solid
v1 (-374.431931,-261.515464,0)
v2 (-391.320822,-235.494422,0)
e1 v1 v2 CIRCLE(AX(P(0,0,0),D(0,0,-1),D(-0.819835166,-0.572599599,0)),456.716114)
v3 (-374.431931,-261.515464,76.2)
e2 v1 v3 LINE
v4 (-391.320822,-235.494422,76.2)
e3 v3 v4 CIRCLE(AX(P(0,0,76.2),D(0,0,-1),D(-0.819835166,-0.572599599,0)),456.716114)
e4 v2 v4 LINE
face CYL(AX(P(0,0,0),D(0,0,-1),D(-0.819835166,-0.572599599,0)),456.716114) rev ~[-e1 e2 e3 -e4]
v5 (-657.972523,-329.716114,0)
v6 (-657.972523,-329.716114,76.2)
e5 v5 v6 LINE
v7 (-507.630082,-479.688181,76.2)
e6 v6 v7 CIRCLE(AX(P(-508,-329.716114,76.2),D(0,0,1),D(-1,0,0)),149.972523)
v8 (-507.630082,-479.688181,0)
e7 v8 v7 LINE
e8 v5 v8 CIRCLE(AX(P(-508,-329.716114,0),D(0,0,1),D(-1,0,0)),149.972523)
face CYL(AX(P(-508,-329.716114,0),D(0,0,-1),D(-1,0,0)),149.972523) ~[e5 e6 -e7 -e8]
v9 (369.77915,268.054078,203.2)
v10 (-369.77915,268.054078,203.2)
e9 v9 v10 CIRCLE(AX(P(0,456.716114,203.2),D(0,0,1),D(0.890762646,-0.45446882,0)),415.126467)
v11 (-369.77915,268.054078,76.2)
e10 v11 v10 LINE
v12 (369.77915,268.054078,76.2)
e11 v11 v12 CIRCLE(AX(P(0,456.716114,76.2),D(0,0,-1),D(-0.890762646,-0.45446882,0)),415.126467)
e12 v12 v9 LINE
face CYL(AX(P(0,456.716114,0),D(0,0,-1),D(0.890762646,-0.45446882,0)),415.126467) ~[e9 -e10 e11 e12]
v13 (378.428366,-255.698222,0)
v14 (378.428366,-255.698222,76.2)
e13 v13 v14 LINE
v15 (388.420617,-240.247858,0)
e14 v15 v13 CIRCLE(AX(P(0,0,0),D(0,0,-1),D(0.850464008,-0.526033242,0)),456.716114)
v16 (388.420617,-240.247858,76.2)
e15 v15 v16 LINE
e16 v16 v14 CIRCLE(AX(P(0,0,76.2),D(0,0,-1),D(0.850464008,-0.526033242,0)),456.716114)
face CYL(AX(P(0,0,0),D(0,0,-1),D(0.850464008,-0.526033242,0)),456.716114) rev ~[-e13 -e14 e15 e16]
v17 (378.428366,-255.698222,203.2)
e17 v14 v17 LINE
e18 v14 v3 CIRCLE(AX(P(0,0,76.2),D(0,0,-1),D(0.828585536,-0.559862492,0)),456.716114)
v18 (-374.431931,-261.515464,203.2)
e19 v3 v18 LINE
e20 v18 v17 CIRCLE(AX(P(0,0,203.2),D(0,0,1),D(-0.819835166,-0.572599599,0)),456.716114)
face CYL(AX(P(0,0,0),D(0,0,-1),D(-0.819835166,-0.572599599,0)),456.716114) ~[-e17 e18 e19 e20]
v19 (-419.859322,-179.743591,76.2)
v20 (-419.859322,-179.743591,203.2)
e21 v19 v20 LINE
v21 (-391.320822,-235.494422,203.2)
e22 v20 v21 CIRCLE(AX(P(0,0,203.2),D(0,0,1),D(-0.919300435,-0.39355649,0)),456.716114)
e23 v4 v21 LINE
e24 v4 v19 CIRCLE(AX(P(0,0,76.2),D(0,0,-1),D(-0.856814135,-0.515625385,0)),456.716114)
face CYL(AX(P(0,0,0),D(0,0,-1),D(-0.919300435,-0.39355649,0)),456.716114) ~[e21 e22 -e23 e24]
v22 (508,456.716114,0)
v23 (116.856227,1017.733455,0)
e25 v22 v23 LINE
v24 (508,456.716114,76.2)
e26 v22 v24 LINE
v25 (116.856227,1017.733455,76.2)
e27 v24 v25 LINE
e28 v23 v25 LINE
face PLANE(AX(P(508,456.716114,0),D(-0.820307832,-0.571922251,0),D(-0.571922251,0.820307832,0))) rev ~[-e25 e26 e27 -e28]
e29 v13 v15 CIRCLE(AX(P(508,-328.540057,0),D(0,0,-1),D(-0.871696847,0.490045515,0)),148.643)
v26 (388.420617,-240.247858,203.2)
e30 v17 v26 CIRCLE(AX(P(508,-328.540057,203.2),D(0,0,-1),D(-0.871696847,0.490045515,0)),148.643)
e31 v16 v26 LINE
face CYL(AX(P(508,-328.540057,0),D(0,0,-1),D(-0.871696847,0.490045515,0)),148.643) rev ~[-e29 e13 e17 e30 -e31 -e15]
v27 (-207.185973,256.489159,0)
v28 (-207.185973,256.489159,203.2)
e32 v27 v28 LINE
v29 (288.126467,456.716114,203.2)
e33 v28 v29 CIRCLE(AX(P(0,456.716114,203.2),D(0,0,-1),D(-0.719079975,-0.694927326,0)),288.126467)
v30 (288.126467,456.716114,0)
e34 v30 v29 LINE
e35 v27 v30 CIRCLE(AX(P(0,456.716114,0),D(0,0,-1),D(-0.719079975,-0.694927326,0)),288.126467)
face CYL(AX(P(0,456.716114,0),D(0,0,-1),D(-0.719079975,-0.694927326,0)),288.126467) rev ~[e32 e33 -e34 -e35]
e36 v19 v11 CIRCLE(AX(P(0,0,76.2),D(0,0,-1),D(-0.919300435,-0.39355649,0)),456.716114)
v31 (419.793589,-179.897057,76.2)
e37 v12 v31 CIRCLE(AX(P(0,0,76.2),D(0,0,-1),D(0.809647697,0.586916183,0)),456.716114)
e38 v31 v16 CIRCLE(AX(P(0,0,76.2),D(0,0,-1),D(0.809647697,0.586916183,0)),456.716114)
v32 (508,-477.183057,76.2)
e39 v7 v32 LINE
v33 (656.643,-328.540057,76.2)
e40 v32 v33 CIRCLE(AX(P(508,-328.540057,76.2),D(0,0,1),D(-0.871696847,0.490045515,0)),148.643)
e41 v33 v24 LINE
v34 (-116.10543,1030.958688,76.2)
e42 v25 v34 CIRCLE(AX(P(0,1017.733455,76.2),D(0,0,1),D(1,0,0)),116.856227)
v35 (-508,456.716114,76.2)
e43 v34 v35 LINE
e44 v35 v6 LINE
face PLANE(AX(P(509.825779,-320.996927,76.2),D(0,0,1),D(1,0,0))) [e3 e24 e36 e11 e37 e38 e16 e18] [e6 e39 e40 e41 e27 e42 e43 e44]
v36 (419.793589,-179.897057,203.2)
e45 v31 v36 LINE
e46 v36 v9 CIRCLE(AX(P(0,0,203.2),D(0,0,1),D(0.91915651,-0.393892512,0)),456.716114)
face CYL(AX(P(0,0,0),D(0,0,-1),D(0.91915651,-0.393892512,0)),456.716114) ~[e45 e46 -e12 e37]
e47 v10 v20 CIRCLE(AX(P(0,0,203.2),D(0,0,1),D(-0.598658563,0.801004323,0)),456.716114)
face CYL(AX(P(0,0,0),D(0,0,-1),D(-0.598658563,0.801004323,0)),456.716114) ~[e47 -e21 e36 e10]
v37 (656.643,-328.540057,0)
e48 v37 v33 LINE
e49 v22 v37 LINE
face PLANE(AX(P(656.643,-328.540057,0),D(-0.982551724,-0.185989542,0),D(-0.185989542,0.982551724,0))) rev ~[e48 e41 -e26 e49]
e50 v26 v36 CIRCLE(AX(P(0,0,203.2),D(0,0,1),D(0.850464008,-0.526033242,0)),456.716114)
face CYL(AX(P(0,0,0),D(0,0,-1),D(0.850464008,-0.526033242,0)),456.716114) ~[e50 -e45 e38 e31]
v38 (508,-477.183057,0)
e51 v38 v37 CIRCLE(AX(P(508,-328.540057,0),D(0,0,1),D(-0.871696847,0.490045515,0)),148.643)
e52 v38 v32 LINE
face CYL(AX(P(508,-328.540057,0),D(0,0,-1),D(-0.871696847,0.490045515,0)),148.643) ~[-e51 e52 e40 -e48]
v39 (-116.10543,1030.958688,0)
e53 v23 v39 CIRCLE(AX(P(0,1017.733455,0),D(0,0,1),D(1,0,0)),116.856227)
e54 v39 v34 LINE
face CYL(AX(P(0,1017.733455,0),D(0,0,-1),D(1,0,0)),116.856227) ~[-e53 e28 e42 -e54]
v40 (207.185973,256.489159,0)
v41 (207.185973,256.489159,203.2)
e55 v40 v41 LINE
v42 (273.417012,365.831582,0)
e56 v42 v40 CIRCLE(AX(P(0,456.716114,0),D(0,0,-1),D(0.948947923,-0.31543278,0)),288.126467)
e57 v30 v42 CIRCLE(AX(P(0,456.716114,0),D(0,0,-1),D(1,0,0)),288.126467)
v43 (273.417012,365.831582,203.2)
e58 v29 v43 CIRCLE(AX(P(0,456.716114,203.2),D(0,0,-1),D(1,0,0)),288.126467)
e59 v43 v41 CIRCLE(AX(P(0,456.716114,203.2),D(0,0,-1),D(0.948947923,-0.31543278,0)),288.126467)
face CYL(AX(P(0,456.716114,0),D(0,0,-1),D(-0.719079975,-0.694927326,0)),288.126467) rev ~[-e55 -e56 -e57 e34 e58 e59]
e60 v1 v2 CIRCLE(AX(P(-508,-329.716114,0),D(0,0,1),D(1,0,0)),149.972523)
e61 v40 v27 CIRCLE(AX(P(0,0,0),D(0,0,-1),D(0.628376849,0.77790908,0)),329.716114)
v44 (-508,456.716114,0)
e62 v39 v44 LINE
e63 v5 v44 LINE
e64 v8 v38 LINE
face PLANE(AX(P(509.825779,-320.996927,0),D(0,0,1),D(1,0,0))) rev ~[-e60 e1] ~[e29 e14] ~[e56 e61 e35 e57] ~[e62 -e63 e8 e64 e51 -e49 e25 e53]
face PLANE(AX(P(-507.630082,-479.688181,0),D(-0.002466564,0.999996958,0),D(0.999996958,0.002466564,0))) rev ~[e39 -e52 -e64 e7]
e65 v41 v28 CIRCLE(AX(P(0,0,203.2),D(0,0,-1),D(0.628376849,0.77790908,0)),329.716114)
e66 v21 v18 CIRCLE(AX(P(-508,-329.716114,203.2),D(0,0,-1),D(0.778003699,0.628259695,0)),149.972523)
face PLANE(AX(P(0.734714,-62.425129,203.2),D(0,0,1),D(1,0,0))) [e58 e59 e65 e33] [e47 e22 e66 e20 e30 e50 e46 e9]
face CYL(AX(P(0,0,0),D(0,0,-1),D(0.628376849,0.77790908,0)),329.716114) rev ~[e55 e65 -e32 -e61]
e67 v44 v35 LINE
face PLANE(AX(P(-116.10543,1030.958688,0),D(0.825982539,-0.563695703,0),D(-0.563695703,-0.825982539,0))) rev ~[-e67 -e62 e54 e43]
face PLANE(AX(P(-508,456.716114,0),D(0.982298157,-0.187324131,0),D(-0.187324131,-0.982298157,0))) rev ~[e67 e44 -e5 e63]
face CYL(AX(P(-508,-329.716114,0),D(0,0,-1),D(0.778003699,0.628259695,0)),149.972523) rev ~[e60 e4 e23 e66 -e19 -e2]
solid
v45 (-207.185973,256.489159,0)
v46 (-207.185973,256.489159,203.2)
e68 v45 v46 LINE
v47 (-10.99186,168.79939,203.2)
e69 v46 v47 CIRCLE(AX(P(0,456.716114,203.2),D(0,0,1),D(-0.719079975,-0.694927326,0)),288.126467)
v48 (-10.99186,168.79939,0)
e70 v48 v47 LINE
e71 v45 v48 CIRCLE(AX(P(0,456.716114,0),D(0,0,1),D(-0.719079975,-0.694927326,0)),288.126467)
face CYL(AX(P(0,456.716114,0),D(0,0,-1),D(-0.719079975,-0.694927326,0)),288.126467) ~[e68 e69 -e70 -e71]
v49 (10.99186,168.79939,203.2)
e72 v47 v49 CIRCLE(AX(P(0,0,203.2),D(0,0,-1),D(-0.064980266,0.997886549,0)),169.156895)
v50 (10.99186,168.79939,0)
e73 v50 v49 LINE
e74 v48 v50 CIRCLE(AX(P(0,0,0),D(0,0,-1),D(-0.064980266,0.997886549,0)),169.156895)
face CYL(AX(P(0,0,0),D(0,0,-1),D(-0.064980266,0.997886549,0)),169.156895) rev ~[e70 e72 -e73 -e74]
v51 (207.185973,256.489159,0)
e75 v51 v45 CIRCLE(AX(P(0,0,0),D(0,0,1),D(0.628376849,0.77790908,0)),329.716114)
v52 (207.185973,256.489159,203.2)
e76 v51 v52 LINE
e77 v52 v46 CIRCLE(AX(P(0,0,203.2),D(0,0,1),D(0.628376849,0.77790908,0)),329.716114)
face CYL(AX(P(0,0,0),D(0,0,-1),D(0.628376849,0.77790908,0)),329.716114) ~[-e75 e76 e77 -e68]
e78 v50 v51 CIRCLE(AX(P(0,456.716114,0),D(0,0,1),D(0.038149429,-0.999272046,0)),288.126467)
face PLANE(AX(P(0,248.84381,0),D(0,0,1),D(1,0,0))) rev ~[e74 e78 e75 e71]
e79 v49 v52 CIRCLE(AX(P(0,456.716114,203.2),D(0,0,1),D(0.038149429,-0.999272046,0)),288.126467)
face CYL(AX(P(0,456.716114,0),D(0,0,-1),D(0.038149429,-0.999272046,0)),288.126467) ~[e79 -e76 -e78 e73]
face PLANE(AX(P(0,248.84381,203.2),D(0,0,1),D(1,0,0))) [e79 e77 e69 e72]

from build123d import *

# Parameters (mm, degrees)
F1_DEPTH = 203.2
F2_DEPTH = 76.2
F3_DEPTH = 76.2


with BuildPart() as f1:
    # F0 (on Top) → F1 (new body)
    with BuildSketch(Plane.XY):
        with BuildLine():
            ThreePointArc((419.7935890943, -179.8970573523), (447.3902688574, -91.8235047271), (456.7161138921, 0))
            ThreePointArc((456.7161138921, 0), (434.4385486274, 140.8998089254), (369.7791499823, 268.054078363))
            ThreePointArc((369.7791499823, 268.054078363), (325.2928462726, 320.5841119777), (273.4170123321, 365.8315815455))
            ThreePointArc((273.4170123321, 365.8315815455), (246.4421811438, 307.4408238889), (207.1859726201, 256.489158659))
            ThreePointArc((207.1859726201, 256.489158659), (297.5107304832, 142.1269890184), (329.7161138921, 0))
            ThreePointArc((329.7161138921, 0), (-142.1269890184, -297.5107304832), (-207.1859726201, 256.489158659))
            ThreePointArc((-207.1859726201, 256.489158659), (-246.4421811438, 307.4408238889), (-273.4170123321, 365.8315815455))
            ThreePointArc((-273.4170123321, 365.8315815455), (-325.2928462726, 320.5841119777), (-369.7791499823, 268.054078363))
            ThreePointArc((-369.7791499823, 268.054078363), (-453.8864585085, 50.7611216519), (-419.8593220682, -179.7435905981))
            ThreePointArc((-419.8593220682, -179.7435905981), (-406.5468550807, -208.1087775964), (-391.3208220922, -235.4944221967))
            ThreePointArc((-391.3208220922, -235.4944221967), (-382.2017695395, -248.0670908962), (-374.4319310628, -261.5154635758))
            ThreePointArc((-374.4319310628, -261.5154635758), (3.5288735732, -456.7024805494), (378.4283659046, -255.6982216744))
            ThreePointArc((378.4283659046, -255.6982216744), (383.1851939749, -247.8182784421), (388.4206166967, -240.2478578752))
            ThreePointArc((388.4206166967, -240.2478578752), (405.232162336, -210.6573124702), (419.7935890943, -179.8970573523))
        make_face()
        with BuildLine():
            ThreePointArc((273.4170123321, 365.8315815455), (325.2928462726, 320.5841119777), (369.7791499823, 268.054078363))
            ThreePointArc((369.7791499823, 268.054078363), (385.986239752, 609.5055315027), (140.4677009498, 847.3550883961))
            ThreePointArc((140.4677009498, 847.3550883961), (1.9062997603, 871.8382036836), (-136.8741128131, 848.6286815054))
            ThreePointArc((-136.8741128131, 848.6286815054), (-385.2805466524, 611.2764056323), (-369.7791499823, 268.054078363))
            ThreePointArc((-369.7791499823, 268.054078363), (-325.2928462726, 320.5841119777), (-273.4170123321, 365.8315815455))
            ThreePointArc((-273.4170123321, 365.8315815455), (-46.0335917284, 741.1414455435), (288.1264667684, 456.7161138921))
            ThreePointArc((288.1264667684, 456.7161138921), (284.4253316514, 410.6825221637), (273.4170123321, 365.8315815455))
        make_face()
    extrude(amount=F1_DEPTH)

    # F0 (on Top) → F2 (join)
    with BuildSketch(Plane.XY):
        with BuildLine():
            ThreePointArc((-136.8741128131, 848.6286815054), (1.9062997603, 871.8382036836), (140.4677009498, 847.3550883961))
            Line((140.4677009498, 847.3550883961), (116.8562267222, 1017.7334547043))
            ThreePointArc((116.8562267222, 1017.7334547043), (-6.6232636312, 901.0650780865), (-116.1054302545, 1030.9586877525))
            Line((-116.1054302545, 1030.9586877525), (-136.8741128131, 848.6286815054))
        make_face()
        with BuildLine():
            ThreePointArc((-369.7791499823, 268.054078363), (-385.2805466524, 611.2764056323), (-136.8741128131, 848.6286815054))
            Line((-136.8741128131, 848.6286815054), (-116.1054302545, 1030.9586877525))
            Line((-116.1054302545, 1030.9586877525), (-508, 456.7161138921))
            Line((-508, 456.7161138921), (-647.4473526625, -274.5237812852))
            ThreePointArc((-647.4473526625, -274.5237812852), (-592.3042832709, -205.6816607537), (-508, -179.7435905981))
            Line((-508, -179.7435905981), (-419.8593220682, -179.7435905981))
            ThreePointArc((-419.8593220682, -179.7435905981), (-453.8864585085, 50.7611216519), (-369.7791499823, 268.054078363))
        make_face()
        with BuildLine():
            ThreePointArc((369.7791499823, 268.054078363), (434.4385486274, 140.8998089254), (456.7161138921, 0))
            ThreePointArc((456.7161138921, 0), (447.3902688574, -91.8235047271), (419.7935890943, -179.8970573523))
            Line((419.7935890943, -179.8970573523), (508, -179.8970573523))
            ThreePointArc((508, -179.8970573523), (591.7238414708, -205.718805945), (646.3592496941, -274.212721728))
            Line((646.3592496941, -274.212721728), (508, 456.7161138919))
            Line((508, 456.7161138919), (116.8562267222, 1017.7334547043))
            Line((116.8562267222, 1017.7334547043), (140.4677009498, 847.3550883961))
            ThreePointArc((140.4677009498, 847.3550883961), (385.986239752, 609.5055315027), (369.7791499823, 268.054078363))
        make_face()
        with BuildLine():
            Line((508, -179.8970573523), (419.7935890943, -179.8970573523))
            ThreePointArc((419.7935890943, -179.8970573523), (405.232162336, -210.6573124702), (388.4206166967, -240.2478578752))
            ThreePointArc((388.4206166967, -240.2478578752), (441.0271546914, -195.8397204001), (508, -179.8970573523))
        make_face()
        with BuildLine():
            ThreePointArc((508, -477.1830565354), (379.6992396403, -403.597742884), (378.4283659046, -255.6982216744))
            ThreePointArc((378.4283659046, -255.6982216744), (3.5288735732, -456.7024805494), (-374.4319310628, -261.5154635758))
            ThreePointArc((-374.4319310628, -261.5154635758), (-362.1862522373, -294.6432083013), (-358.027476706, -329.7161138921))
            ThreePointArc((-358.027476706, -329.7161138921), (-401.8227065948, -435.6318356161), (-507.6300820622, -479.6881809709))
            Line((-507.6300820622, -479.6881809709), (508, -477.1830565354))
        make_face()
        with BuildLine():
            ThreePointArc((-391.3208220922, -235.4944221967), (-406.5468550807, -208.1087775964), (-419.8593220682, -179.7435905981))
            Line((-419.8593220682, -179.7435905981), (-508, -179.7435905981))
            ThreePointArc((-508, -179.7435905981), (-443.3428546463, -194.3971895028), (-391.3208220922, -235.4944221967))
        make_face()
    extrude(amount=F2_DEPTH)

    # F0 (on Top) → F3 (join)
    with BuildSketch(Plane.XY):
        with BuildLine():
            ThreePointArc((508, -179.8970573523), (441.0271546914, -195.8397204001), (388.4206166967, -240.2478578752))
            ThreePointArc((388.4206166967, -240.2478578752), (383.5023063354, -248.0233652786), (378.4283659046, -255.6982216744))
            ThreePointArc((378.4283659046, -255.6982216744), (379.6992396403, -403.597742884), (508, -477.1830565354))
            ThreePointArc((508, -477.1830565354), (613.1064729871, -433.646529931), (656.6429995915, -328.5400569439))
            Line((656.6429995915, -328.5400569439), (646.3592496941, -274.212721728))
            ThreePointArc((646.3592496941, -274.212721728), (591.7238414708, -205.718805945), (508, -179.8970573523))
        make_face()
        with BuildLine():
            ThreePointArc((-358.027476706, -329.7161138921), (-362.1862522373, -294.6432083013), (-374.4319310628, -261.5154635758))
            ThreePointArc((-374.4319310628, -261.5154635758), (-383.0973680277, -248.6483768275), (-391.3208220922, -235.4944221967))
            ThreePointArc((-391.3208220922, -235.4944221967), (-443.3428546463, -194.3971895028), (-508, -179.7435905981))
            ThreePointArc((-508, -179.7435905981), (-592.3042832709, -205.6816607537), (-647.4473526625, -274.5237812852))
            Line((-647.4473526625, -274.5237812852), (-657.972523294, -329.7161138921))
            ThreePointArc((-657.972523294, -329.7161138921), (-613.915721724, -435.8934072973), (-507.6300820622, -479.6881809709))
            ThreePointArc((-507.6300820622, -479.6881809709), (-401.8227065948, -435.6318356161), (-358.027476706, -329.7161138921))
        make_face()
        with BuildLine():
            ThreePointArc((-116.1054302545, 1030.9586877525), (-6.6232636312, 901.0650780865), (116.8562267222, 1017.7334547043))
            ThreePointArc((116.8562267222, 1017.7334547043), (6.6232636312, 1134.401831322), (-116.1054302545, 1030.9586877525))
        make_face()
    extrude(amount=F3_DEPTH)


with BuildPart() as f1b:
    # F0 (on Top) → F1, piece 2 (new body)
    with BuildSketch(Plane.XY):
        with BuildLine():
            ThreePointArc((10.9918600793, 168.7993900561), (117.5702579301, 193.6684085178), (207.1859726201, 256.489158659))
            ThreePointArc((207.1859726201, 256.489158659), (0, 329.7161138921), (-207.1859726201, 256.489158659))
            ThreePointArc((-207.1859726201, 256.489158659), (-117.5702579301, 193.6684085178), (-10.9918600793, 168.7993900561))
            ThreePointArc((-10.9918600793, 168.7993900561), (0, 169.1568948383), (10.9918600793, 168.7993900561))
        make_face()
    extrude(amount=F1_DEPTH)


solid = Compound([f1.part, f1b.part])
